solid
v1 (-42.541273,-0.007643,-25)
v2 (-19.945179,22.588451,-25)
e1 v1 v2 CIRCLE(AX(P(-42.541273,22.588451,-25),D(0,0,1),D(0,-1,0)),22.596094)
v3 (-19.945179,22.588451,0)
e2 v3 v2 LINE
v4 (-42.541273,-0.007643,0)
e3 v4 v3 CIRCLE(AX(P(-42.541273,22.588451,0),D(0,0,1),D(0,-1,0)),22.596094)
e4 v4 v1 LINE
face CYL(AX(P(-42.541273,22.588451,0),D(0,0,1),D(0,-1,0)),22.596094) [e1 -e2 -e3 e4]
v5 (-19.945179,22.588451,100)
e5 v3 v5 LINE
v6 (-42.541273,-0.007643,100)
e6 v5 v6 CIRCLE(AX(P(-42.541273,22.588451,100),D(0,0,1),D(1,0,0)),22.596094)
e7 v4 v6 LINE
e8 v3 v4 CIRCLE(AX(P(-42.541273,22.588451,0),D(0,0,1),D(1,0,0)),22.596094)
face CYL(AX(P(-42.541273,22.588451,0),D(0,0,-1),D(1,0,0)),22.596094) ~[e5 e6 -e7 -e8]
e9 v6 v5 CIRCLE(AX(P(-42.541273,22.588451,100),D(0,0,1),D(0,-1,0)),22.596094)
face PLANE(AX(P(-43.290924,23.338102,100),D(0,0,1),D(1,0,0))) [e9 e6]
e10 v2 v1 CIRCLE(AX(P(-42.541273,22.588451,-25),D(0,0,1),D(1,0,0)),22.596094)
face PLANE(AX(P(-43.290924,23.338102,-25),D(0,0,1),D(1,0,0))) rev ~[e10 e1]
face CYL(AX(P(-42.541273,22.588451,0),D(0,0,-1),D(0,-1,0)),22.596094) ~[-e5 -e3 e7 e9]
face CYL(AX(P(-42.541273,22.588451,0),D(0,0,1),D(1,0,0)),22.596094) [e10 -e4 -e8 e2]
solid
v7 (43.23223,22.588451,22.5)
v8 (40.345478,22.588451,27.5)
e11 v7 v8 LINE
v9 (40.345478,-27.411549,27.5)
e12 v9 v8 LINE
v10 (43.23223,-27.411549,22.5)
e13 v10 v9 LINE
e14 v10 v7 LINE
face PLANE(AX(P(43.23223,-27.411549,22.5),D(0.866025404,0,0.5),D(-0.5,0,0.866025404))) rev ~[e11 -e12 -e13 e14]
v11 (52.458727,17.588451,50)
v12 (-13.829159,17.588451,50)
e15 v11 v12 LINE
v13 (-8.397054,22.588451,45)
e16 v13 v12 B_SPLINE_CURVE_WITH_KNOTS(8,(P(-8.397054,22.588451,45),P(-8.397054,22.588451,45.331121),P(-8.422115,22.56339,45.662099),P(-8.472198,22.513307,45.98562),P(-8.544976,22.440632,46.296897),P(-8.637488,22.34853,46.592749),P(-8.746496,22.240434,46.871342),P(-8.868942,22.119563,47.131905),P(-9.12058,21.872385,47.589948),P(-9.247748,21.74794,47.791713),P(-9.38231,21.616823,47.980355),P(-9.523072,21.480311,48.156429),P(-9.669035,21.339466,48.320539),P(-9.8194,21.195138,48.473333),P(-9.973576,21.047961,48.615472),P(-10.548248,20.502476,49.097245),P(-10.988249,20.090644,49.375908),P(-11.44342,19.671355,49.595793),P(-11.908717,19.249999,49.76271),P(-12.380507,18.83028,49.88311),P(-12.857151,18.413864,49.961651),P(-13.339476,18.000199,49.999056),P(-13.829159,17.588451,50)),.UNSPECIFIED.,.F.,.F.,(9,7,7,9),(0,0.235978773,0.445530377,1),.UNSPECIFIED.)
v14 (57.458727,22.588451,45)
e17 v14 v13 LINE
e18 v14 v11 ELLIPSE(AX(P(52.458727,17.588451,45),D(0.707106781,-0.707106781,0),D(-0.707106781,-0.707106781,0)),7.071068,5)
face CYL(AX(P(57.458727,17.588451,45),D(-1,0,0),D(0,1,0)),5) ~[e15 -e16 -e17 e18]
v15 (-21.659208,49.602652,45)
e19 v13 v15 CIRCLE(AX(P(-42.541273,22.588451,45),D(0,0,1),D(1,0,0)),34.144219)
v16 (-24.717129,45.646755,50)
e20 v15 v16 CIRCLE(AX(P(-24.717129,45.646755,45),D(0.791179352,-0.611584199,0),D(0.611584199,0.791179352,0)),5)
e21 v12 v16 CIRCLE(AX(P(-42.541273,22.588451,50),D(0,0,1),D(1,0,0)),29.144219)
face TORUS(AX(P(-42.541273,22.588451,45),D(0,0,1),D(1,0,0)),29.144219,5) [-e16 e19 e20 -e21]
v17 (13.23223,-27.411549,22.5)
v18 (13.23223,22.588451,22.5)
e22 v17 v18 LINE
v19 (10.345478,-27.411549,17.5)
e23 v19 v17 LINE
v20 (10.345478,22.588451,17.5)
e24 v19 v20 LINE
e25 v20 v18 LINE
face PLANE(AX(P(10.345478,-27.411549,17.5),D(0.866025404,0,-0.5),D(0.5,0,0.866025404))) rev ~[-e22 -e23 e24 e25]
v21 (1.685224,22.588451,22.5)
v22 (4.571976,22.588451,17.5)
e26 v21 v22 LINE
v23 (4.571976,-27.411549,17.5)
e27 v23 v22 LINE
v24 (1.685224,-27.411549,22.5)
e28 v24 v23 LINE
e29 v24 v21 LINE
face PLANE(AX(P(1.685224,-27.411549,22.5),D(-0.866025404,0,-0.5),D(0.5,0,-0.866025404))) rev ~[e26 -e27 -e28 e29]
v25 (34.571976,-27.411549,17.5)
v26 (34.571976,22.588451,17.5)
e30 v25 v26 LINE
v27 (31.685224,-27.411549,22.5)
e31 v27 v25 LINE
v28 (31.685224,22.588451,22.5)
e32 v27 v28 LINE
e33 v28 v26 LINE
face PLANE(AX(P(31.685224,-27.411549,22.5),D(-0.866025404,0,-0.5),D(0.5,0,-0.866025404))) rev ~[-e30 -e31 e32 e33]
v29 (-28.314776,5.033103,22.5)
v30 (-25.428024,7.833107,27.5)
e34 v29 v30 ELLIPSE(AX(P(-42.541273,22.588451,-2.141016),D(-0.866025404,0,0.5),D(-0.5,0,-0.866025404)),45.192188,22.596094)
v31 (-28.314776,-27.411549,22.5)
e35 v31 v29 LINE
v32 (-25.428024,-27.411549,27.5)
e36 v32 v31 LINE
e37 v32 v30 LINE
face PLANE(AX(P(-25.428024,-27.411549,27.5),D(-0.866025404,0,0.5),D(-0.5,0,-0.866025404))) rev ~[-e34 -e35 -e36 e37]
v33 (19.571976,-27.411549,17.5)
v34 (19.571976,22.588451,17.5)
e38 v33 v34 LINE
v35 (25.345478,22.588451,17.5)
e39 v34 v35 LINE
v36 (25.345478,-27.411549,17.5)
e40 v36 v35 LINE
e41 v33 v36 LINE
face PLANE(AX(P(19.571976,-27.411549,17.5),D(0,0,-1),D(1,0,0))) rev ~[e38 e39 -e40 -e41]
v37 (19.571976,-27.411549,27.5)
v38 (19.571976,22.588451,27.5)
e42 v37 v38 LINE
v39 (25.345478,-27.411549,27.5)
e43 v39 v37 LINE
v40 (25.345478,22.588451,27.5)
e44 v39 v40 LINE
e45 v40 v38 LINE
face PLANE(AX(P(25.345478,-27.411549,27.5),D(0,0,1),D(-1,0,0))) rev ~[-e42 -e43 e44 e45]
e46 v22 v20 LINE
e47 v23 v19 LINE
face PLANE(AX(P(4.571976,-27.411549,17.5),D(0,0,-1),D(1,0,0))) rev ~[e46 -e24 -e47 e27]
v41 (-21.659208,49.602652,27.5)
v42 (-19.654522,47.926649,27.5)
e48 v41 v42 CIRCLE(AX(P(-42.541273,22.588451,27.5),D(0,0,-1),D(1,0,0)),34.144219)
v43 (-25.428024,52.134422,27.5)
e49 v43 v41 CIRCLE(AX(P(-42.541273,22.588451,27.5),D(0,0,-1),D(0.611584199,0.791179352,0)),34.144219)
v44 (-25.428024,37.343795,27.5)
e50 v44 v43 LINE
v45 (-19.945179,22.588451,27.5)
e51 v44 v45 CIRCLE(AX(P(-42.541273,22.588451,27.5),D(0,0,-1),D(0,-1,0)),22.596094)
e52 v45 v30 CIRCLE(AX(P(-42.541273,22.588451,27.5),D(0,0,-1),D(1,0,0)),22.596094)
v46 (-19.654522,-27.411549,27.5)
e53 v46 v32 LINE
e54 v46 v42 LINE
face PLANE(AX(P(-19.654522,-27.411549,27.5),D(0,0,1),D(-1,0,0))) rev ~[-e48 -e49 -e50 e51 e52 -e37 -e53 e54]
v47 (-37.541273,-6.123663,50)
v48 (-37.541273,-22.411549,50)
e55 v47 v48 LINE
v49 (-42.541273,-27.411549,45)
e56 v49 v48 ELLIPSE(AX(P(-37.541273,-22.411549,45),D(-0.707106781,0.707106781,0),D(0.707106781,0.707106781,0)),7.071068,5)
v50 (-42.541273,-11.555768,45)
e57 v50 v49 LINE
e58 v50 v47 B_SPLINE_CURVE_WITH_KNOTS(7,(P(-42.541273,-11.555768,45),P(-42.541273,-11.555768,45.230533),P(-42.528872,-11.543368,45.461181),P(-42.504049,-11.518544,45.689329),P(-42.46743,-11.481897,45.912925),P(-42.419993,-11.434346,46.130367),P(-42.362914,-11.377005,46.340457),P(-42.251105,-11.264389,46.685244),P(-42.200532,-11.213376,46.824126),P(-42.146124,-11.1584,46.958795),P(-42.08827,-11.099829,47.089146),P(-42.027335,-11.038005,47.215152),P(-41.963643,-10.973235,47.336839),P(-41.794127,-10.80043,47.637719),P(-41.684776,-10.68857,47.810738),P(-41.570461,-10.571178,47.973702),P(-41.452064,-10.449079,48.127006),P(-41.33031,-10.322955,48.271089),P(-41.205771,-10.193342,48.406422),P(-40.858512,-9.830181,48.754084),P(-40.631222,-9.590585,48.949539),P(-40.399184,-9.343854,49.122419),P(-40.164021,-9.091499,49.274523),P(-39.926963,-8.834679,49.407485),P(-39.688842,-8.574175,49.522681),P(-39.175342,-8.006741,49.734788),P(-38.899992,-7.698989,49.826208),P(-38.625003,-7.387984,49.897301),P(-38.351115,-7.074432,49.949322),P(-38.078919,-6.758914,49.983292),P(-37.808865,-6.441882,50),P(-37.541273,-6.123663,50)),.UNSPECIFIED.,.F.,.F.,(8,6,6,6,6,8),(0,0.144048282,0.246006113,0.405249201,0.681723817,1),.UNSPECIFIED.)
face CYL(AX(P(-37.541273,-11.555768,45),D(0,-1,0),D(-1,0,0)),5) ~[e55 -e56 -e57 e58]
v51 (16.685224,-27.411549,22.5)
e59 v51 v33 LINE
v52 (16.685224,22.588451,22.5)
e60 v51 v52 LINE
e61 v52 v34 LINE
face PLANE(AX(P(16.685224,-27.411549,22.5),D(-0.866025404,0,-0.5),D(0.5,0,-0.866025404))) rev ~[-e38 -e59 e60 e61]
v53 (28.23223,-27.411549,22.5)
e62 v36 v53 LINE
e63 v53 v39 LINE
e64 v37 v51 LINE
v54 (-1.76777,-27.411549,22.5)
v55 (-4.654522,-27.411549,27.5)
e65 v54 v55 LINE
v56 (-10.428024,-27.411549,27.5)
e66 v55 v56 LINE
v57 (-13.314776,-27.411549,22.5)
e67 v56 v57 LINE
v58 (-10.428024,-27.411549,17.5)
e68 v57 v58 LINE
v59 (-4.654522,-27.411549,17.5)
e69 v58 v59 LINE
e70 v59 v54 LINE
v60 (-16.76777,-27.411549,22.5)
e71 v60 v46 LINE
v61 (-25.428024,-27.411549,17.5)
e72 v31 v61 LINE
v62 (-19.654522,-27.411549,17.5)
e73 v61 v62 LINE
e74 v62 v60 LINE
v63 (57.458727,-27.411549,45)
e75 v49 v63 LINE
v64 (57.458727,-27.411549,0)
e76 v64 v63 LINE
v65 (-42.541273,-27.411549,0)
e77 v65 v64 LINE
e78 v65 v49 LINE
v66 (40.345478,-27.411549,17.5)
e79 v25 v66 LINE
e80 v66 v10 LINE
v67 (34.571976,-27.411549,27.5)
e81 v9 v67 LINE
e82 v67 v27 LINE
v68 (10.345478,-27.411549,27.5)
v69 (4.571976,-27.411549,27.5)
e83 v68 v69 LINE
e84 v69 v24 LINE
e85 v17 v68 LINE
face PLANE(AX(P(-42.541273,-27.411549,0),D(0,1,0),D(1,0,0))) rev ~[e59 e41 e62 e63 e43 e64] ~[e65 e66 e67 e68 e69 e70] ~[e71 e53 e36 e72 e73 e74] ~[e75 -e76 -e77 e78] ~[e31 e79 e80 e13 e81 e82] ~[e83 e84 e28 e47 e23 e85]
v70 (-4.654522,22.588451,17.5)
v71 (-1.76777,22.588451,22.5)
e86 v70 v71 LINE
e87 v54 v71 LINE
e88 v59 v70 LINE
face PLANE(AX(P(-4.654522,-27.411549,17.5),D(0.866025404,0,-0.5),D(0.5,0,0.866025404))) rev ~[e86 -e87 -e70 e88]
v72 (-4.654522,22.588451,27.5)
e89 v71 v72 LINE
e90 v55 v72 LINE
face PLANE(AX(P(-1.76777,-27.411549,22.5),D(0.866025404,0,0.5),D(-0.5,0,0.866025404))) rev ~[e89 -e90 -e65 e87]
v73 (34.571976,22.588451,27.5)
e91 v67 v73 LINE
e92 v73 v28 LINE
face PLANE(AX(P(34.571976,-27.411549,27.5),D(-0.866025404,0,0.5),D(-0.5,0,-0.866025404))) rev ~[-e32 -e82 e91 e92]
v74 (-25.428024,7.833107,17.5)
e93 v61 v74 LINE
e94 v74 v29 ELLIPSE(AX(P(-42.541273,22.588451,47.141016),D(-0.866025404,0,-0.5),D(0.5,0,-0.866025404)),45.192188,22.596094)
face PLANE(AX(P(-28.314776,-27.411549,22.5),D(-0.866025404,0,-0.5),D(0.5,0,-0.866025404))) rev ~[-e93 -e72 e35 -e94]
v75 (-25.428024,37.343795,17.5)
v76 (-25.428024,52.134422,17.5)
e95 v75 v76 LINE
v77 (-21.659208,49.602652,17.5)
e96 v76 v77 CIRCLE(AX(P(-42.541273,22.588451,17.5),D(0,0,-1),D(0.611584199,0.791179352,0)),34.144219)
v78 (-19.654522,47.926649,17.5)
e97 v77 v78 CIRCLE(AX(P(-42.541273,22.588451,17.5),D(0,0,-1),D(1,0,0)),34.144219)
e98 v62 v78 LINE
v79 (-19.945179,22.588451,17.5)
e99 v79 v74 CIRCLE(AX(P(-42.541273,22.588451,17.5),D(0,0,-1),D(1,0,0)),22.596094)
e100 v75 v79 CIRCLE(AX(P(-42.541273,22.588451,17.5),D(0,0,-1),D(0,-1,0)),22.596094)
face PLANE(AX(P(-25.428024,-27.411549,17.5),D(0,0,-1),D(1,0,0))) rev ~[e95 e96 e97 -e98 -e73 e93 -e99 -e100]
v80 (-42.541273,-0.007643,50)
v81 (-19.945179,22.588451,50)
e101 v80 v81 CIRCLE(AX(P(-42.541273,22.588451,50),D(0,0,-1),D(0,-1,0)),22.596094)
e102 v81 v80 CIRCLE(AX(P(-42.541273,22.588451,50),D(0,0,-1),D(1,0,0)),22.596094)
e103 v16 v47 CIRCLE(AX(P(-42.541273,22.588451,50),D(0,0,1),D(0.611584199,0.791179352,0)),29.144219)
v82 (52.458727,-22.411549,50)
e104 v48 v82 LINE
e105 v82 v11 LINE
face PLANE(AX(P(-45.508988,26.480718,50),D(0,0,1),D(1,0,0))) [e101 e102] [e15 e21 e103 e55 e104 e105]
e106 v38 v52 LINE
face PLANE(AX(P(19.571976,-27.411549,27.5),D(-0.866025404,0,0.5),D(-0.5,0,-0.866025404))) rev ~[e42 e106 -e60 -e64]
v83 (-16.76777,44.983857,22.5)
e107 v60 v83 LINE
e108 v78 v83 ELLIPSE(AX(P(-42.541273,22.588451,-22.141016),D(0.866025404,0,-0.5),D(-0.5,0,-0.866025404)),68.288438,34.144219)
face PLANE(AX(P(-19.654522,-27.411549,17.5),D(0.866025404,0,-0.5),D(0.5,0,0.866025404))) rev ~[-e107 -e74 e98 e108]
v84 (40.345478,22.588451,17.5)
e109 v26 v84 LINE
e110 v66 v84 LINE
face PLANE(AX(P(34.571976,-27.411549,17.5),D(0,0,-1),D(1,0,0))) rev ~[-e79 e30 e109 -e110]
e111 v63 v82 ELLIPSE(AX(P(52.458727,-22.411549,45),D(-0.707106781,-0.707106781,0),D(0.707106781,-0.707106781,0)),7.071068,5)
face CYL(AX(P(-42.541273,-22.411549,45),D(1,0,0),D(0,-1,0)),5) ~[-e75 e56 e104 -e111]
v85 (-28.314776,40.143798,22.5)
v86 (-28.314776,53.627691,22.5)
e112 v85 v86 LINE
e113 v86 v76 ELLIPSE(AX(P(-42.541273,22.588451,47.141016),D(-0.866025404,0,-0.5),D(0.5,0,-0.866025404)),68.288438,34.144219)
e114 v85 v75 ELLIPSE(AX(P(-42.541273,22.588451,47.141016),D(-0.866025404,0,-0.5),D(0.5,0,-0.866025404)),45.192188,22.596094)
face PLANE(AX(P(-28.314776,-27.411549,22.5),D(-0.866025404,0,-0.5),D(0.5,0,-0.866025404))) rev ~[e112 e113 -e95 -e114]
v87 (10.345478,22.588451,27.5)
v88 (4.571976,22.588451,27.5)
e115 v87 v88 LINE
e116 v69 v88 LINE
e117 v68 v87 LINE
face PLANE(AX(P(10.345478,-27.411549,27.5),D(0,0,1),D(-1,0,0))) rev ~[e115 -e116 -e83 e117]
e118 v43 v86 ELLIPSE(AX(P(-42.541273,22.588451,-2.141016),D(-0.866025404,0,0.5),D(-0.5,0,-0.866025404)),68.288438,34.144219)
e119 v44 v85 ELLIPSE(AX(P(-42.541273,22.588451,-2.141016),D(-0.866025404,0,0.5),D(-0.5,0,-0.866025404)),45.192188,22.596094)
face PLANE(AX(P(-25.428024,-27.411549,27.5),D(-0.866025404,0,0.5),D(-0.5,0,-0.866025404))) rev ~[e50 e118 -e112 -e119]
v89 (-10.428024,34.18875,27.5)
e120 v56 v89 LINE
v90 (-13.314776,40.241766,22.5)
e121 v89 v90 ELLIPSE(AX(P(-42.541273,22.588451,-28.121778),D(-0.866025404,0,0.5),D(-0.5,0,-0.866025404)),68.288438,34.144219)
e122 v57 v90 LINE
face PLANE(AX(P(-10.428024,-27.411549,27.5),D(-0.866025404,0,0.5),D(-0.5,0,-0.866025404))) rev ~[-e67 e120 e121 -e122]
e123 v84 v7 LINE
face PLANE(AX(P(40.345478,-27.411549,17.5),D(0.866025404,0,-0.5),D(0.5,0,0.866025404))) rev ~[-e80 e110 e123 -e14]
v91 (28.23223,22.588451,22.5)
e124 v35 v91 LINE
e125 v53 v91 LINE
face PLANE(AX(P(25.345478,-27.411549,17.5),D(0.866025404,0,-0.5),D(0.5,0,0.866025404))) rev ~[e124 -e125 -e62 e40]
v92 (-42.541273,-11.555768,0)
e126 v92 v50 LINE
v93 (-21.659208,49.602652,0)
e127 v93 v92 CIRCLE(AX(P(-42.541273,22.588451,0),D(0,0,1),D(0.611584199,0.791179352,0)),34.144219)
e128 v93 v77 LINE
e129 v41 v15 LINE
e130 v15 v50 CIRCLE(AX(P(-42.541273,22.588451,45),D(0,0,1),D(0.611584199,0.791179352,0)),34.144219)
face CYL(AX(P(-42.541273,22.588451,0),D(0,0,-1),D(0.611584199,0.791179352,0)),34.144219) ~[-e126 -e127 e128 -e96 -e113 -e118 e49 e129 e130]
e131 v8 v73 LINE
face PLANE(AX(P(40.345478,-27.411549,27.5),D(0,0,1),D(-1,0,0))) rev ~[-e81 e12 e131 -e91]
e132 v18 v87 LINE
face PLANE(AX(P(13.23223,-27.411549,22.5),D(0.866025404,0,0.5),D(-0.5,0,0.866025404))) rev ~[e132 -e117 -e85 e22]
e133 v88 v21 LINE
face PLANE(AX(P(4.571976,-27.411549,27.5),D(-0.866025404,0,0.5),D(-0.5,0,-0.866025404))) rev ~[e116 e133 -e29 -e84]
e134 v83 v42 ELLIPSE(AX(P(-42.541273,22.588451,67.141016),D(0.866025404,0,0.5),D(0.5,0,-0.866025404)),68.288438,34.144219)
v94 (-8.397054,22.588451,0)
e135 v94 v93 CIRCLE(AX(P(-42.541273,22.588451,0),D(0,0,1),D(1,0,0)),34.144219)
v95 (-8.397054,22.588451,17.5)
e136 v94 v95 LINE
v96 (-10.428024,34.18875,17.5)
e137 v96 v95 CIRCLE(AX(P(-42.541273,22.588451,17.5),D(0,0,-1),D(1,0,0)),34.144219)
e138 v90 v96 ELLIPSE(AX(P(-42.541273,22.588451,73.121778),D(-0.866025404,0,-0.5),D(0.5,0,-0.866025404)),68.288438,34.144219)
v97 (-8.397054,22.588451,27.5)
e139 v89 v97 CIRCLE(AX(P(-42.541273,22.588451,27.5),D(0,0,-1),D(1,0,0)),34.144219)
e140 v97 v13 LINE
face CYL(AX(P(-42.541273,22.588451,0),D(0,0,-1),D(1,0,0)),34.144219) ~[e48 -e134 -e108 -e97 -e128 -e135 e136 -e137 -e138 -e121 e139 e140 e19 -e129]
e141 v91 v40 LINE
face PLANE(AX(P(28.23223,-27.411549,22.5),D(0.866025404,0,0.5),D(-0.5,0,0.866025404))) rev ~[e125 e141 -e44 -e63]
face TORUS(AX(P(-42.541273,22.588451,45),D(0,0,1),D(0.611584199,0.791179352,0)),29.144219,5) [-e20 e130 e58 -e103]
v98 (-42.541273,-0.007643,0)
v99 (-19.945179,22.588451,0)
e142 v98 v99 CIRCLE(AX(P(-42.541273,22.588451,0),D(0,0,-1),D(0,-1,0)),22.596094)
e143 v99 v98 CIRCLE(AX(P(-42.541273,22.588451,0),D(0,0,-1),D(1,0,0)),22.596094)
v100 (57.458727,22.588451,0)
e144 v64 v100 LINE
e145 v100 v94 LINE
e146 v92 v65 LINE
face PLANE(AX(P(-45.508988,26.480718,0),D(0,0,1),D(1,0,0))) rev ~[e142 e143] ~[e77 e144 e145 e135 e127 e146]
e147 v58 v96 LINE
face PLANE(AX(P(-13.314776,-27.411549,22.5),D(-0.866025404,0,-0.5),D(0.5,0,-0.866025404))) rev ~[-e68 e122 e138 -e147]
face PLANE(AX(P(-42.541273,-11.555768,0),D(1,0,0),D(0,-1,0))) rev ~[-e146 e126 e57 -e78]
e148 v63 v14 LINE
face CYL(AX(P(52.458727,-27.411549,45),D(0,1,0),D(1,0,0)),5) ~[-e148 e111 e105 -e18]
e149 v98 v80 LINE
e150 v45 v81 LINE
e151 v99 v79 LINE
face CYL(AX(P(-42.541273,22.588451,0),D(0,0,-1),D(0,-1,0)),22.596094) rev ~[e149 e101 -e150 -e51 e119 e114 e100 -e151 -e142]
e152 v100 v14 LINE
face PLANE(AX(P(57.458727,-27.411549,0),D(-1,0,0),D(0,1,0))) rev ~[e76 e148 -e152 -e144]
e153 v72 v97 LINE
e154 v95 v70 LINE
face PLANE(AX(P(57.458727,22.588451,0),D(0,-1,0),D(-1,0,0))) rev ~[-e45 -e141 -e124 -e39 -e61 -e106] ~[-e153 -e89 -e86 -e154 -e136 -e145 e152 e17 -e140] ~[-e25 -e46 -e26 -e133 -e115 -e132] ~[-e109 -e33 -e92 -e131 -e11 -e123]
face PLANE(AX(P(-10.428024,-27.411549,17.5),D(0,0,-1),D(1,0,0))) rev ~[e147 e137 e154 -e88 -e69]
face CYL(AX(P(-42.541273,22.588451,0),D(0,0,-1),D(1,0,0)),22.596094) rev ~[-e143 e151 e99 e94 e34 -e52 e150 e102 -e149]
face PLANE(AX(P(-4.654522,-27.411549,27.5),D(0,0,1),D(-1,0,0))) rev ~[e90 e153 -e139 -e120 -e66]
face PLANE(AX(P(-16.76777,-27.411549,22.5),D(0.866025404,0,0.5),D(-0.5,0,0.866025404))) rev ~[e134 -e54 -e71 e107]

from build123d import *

# Parameters (mm, degrees)
F1_DEPTH      = 50
F2_DEPTH      = 100
F2_DEPTH_BACK = 25
F3_R          = 5
F5_DEPTH      = 84.1452189972


with BuildPart() as f1:
    # F0 (on Top) → F1 (new body)
    with BuildSketch(Plane.XY):
        with BuildLine():
            ThreePointArc((-42.5412729383, -0.0076430535), (-58.519124099, 38.5663019163), (-19.9451791292, 22.5884507556))
            Line((-19.9451791292, 22.5884507556), (-8.397054041, 22.5884507556))
            ThreePointArc((-8.397054041, 22.5884507556), (-11.8913995751, 37.6354752761), (-21.6592081763, 49.6026517502))
            ThreePointArc((-21.6592081763, 49.6026517502), (-74.853859311, 33.621330978), (-42.5412729383, -11.5557681416))
            Line((-42.5412729383, -11.5557681416), (-42.5412729383, -0.0076430535))
        make_face()
        with BuildLine():
            Line((57.4587270617, 22.5884507556), (-8.397054041, 22.5884507556))
            ThreePointArc((-8.397054041, 22.5884507556), (-18.3976642177, -1.555157965), (-42.5412729383, -11.5557681416))
            Line((-42.5412729383, -11.5557681416), (-42.5412729383, -27.4115492444))
            Line((-42.5412729383, -27.4115492444), (57.4587270617, -27.4115492444))
            Line((57.4587270617, -27.4115492444), (57.4587270617, 22.5884507556))
        make_face()
        with BuildLine():
            Line((-8.397054041, 22.5884507556), (-19.9451791292, 22.5884507556))
            ThreePointArc((-19.9451791292, 22.5884507556), (-26.5634217775, 6.6105995948), (-42.5412729383, -0.0076430535))
            Line((-42.5412729383, -0.0076430535), (-42.5412729383, -11.5557681416))
            ThreePointArc((-42.5412729383, -11.5557681416), (-18.3976642177, -1.555157965), (-8.397054041, 22.5884507556))
        make_face()
    extrude(amount=F1_DEPTH)

    # F3
    f3_edges = [f1.edges().sort_by_distance(p)[0] for p in [
        (7.458727, -27.411549, 50),
        (-42.541273, -19.483659, 50),
        (-66.684882, 46.732059, 50),
        (24.530837, 22.588451, 50),
        (57.458727, -2.411549, 50),
    ]]
    fillet(f3_edges, radius=F3_R)

    # F4 (on face) → F5 (cut, through all)
    with BuildSketch(Plane.XZ.offset(27.4115492444)):
        Polygon((-19.6545215923, 17.5), (-16.7677702464, 22.5), (-19.6545215923, 27.5), (-25.4280242842, 27.5), (-28.3147756301, 22.5), (-25.4280242842, 17.5), align=None)
        Polygon((-4.6545215923, 27.5), (-10.4280242842, 27.5), (-13.3147756301, 22.5), (-10.4280242842, 17.5), (-4.6545215923, 17.5), (-1.7677702464, 22.5), align=None)
        Polygon((10.3454784077, 27.5), (4.5719757158, 27.5), (1.6852243699, 22.5), (4.5719757158, 17.5), (10.3454784077, 17.5), (13.2322297536, 22.5), align=None)
        Polygon((25.3454784077, 27.5), (19.5719757158, 27.5), (16.6852243699, 22.5), (19.5719757158, 17.5), (25.3454784077, 17.5), (28.2322297536, 22.5), align=None)
        Polygon((40.3454784077, 27.5), (34.5719757158, 27.5), (31.6852243699, 22.5), (34.5719757158, 17.5), (40.3454784077, 17.5), (43.2322297536, 22.5), align=None)
    extrude(amount=-F5_DEPTH, mode=Mode.SUBTRACT)


with BuildPart() as f2:
    # F0 (on Top) → F2 (new body, two sides)
    with BuildSketch(Plane.XY) as f2_sk:
        with BuildLine():
            Line((-42.5412729383, -0.0076430535), (-42.5412729383, 22.5884507556))
            Line((-42.5412729383, 22.5884507556), (-19.9451791292, 22.5884507556))
            ThreePointArc((-19.9451791292, 22.5884507556), (-58.519124099, 38.5663019163), (-42.5412729383, -0.0076430535))
        make_face()
        with BuildLine():
            Line((-19.9451791292, 22.5884507556), (-42.5412729383, 22.5884507556))
            Line((-42.5412729383, 22.5884507556), (-42.5412729383, -0.0076430535))
            ThreePointArc((-42.5412729383, -0.0076430535), (-26.5634217775, 6.6105995948), (-19.9451791292, 22.5884507556))
        make_face()
    extrude(amount=F2_DEPTH)
    extrude(f2_sk.sketch, amount=-F2_DEPTH_BACK)


solid = Compound([f1.part, f2.part])
